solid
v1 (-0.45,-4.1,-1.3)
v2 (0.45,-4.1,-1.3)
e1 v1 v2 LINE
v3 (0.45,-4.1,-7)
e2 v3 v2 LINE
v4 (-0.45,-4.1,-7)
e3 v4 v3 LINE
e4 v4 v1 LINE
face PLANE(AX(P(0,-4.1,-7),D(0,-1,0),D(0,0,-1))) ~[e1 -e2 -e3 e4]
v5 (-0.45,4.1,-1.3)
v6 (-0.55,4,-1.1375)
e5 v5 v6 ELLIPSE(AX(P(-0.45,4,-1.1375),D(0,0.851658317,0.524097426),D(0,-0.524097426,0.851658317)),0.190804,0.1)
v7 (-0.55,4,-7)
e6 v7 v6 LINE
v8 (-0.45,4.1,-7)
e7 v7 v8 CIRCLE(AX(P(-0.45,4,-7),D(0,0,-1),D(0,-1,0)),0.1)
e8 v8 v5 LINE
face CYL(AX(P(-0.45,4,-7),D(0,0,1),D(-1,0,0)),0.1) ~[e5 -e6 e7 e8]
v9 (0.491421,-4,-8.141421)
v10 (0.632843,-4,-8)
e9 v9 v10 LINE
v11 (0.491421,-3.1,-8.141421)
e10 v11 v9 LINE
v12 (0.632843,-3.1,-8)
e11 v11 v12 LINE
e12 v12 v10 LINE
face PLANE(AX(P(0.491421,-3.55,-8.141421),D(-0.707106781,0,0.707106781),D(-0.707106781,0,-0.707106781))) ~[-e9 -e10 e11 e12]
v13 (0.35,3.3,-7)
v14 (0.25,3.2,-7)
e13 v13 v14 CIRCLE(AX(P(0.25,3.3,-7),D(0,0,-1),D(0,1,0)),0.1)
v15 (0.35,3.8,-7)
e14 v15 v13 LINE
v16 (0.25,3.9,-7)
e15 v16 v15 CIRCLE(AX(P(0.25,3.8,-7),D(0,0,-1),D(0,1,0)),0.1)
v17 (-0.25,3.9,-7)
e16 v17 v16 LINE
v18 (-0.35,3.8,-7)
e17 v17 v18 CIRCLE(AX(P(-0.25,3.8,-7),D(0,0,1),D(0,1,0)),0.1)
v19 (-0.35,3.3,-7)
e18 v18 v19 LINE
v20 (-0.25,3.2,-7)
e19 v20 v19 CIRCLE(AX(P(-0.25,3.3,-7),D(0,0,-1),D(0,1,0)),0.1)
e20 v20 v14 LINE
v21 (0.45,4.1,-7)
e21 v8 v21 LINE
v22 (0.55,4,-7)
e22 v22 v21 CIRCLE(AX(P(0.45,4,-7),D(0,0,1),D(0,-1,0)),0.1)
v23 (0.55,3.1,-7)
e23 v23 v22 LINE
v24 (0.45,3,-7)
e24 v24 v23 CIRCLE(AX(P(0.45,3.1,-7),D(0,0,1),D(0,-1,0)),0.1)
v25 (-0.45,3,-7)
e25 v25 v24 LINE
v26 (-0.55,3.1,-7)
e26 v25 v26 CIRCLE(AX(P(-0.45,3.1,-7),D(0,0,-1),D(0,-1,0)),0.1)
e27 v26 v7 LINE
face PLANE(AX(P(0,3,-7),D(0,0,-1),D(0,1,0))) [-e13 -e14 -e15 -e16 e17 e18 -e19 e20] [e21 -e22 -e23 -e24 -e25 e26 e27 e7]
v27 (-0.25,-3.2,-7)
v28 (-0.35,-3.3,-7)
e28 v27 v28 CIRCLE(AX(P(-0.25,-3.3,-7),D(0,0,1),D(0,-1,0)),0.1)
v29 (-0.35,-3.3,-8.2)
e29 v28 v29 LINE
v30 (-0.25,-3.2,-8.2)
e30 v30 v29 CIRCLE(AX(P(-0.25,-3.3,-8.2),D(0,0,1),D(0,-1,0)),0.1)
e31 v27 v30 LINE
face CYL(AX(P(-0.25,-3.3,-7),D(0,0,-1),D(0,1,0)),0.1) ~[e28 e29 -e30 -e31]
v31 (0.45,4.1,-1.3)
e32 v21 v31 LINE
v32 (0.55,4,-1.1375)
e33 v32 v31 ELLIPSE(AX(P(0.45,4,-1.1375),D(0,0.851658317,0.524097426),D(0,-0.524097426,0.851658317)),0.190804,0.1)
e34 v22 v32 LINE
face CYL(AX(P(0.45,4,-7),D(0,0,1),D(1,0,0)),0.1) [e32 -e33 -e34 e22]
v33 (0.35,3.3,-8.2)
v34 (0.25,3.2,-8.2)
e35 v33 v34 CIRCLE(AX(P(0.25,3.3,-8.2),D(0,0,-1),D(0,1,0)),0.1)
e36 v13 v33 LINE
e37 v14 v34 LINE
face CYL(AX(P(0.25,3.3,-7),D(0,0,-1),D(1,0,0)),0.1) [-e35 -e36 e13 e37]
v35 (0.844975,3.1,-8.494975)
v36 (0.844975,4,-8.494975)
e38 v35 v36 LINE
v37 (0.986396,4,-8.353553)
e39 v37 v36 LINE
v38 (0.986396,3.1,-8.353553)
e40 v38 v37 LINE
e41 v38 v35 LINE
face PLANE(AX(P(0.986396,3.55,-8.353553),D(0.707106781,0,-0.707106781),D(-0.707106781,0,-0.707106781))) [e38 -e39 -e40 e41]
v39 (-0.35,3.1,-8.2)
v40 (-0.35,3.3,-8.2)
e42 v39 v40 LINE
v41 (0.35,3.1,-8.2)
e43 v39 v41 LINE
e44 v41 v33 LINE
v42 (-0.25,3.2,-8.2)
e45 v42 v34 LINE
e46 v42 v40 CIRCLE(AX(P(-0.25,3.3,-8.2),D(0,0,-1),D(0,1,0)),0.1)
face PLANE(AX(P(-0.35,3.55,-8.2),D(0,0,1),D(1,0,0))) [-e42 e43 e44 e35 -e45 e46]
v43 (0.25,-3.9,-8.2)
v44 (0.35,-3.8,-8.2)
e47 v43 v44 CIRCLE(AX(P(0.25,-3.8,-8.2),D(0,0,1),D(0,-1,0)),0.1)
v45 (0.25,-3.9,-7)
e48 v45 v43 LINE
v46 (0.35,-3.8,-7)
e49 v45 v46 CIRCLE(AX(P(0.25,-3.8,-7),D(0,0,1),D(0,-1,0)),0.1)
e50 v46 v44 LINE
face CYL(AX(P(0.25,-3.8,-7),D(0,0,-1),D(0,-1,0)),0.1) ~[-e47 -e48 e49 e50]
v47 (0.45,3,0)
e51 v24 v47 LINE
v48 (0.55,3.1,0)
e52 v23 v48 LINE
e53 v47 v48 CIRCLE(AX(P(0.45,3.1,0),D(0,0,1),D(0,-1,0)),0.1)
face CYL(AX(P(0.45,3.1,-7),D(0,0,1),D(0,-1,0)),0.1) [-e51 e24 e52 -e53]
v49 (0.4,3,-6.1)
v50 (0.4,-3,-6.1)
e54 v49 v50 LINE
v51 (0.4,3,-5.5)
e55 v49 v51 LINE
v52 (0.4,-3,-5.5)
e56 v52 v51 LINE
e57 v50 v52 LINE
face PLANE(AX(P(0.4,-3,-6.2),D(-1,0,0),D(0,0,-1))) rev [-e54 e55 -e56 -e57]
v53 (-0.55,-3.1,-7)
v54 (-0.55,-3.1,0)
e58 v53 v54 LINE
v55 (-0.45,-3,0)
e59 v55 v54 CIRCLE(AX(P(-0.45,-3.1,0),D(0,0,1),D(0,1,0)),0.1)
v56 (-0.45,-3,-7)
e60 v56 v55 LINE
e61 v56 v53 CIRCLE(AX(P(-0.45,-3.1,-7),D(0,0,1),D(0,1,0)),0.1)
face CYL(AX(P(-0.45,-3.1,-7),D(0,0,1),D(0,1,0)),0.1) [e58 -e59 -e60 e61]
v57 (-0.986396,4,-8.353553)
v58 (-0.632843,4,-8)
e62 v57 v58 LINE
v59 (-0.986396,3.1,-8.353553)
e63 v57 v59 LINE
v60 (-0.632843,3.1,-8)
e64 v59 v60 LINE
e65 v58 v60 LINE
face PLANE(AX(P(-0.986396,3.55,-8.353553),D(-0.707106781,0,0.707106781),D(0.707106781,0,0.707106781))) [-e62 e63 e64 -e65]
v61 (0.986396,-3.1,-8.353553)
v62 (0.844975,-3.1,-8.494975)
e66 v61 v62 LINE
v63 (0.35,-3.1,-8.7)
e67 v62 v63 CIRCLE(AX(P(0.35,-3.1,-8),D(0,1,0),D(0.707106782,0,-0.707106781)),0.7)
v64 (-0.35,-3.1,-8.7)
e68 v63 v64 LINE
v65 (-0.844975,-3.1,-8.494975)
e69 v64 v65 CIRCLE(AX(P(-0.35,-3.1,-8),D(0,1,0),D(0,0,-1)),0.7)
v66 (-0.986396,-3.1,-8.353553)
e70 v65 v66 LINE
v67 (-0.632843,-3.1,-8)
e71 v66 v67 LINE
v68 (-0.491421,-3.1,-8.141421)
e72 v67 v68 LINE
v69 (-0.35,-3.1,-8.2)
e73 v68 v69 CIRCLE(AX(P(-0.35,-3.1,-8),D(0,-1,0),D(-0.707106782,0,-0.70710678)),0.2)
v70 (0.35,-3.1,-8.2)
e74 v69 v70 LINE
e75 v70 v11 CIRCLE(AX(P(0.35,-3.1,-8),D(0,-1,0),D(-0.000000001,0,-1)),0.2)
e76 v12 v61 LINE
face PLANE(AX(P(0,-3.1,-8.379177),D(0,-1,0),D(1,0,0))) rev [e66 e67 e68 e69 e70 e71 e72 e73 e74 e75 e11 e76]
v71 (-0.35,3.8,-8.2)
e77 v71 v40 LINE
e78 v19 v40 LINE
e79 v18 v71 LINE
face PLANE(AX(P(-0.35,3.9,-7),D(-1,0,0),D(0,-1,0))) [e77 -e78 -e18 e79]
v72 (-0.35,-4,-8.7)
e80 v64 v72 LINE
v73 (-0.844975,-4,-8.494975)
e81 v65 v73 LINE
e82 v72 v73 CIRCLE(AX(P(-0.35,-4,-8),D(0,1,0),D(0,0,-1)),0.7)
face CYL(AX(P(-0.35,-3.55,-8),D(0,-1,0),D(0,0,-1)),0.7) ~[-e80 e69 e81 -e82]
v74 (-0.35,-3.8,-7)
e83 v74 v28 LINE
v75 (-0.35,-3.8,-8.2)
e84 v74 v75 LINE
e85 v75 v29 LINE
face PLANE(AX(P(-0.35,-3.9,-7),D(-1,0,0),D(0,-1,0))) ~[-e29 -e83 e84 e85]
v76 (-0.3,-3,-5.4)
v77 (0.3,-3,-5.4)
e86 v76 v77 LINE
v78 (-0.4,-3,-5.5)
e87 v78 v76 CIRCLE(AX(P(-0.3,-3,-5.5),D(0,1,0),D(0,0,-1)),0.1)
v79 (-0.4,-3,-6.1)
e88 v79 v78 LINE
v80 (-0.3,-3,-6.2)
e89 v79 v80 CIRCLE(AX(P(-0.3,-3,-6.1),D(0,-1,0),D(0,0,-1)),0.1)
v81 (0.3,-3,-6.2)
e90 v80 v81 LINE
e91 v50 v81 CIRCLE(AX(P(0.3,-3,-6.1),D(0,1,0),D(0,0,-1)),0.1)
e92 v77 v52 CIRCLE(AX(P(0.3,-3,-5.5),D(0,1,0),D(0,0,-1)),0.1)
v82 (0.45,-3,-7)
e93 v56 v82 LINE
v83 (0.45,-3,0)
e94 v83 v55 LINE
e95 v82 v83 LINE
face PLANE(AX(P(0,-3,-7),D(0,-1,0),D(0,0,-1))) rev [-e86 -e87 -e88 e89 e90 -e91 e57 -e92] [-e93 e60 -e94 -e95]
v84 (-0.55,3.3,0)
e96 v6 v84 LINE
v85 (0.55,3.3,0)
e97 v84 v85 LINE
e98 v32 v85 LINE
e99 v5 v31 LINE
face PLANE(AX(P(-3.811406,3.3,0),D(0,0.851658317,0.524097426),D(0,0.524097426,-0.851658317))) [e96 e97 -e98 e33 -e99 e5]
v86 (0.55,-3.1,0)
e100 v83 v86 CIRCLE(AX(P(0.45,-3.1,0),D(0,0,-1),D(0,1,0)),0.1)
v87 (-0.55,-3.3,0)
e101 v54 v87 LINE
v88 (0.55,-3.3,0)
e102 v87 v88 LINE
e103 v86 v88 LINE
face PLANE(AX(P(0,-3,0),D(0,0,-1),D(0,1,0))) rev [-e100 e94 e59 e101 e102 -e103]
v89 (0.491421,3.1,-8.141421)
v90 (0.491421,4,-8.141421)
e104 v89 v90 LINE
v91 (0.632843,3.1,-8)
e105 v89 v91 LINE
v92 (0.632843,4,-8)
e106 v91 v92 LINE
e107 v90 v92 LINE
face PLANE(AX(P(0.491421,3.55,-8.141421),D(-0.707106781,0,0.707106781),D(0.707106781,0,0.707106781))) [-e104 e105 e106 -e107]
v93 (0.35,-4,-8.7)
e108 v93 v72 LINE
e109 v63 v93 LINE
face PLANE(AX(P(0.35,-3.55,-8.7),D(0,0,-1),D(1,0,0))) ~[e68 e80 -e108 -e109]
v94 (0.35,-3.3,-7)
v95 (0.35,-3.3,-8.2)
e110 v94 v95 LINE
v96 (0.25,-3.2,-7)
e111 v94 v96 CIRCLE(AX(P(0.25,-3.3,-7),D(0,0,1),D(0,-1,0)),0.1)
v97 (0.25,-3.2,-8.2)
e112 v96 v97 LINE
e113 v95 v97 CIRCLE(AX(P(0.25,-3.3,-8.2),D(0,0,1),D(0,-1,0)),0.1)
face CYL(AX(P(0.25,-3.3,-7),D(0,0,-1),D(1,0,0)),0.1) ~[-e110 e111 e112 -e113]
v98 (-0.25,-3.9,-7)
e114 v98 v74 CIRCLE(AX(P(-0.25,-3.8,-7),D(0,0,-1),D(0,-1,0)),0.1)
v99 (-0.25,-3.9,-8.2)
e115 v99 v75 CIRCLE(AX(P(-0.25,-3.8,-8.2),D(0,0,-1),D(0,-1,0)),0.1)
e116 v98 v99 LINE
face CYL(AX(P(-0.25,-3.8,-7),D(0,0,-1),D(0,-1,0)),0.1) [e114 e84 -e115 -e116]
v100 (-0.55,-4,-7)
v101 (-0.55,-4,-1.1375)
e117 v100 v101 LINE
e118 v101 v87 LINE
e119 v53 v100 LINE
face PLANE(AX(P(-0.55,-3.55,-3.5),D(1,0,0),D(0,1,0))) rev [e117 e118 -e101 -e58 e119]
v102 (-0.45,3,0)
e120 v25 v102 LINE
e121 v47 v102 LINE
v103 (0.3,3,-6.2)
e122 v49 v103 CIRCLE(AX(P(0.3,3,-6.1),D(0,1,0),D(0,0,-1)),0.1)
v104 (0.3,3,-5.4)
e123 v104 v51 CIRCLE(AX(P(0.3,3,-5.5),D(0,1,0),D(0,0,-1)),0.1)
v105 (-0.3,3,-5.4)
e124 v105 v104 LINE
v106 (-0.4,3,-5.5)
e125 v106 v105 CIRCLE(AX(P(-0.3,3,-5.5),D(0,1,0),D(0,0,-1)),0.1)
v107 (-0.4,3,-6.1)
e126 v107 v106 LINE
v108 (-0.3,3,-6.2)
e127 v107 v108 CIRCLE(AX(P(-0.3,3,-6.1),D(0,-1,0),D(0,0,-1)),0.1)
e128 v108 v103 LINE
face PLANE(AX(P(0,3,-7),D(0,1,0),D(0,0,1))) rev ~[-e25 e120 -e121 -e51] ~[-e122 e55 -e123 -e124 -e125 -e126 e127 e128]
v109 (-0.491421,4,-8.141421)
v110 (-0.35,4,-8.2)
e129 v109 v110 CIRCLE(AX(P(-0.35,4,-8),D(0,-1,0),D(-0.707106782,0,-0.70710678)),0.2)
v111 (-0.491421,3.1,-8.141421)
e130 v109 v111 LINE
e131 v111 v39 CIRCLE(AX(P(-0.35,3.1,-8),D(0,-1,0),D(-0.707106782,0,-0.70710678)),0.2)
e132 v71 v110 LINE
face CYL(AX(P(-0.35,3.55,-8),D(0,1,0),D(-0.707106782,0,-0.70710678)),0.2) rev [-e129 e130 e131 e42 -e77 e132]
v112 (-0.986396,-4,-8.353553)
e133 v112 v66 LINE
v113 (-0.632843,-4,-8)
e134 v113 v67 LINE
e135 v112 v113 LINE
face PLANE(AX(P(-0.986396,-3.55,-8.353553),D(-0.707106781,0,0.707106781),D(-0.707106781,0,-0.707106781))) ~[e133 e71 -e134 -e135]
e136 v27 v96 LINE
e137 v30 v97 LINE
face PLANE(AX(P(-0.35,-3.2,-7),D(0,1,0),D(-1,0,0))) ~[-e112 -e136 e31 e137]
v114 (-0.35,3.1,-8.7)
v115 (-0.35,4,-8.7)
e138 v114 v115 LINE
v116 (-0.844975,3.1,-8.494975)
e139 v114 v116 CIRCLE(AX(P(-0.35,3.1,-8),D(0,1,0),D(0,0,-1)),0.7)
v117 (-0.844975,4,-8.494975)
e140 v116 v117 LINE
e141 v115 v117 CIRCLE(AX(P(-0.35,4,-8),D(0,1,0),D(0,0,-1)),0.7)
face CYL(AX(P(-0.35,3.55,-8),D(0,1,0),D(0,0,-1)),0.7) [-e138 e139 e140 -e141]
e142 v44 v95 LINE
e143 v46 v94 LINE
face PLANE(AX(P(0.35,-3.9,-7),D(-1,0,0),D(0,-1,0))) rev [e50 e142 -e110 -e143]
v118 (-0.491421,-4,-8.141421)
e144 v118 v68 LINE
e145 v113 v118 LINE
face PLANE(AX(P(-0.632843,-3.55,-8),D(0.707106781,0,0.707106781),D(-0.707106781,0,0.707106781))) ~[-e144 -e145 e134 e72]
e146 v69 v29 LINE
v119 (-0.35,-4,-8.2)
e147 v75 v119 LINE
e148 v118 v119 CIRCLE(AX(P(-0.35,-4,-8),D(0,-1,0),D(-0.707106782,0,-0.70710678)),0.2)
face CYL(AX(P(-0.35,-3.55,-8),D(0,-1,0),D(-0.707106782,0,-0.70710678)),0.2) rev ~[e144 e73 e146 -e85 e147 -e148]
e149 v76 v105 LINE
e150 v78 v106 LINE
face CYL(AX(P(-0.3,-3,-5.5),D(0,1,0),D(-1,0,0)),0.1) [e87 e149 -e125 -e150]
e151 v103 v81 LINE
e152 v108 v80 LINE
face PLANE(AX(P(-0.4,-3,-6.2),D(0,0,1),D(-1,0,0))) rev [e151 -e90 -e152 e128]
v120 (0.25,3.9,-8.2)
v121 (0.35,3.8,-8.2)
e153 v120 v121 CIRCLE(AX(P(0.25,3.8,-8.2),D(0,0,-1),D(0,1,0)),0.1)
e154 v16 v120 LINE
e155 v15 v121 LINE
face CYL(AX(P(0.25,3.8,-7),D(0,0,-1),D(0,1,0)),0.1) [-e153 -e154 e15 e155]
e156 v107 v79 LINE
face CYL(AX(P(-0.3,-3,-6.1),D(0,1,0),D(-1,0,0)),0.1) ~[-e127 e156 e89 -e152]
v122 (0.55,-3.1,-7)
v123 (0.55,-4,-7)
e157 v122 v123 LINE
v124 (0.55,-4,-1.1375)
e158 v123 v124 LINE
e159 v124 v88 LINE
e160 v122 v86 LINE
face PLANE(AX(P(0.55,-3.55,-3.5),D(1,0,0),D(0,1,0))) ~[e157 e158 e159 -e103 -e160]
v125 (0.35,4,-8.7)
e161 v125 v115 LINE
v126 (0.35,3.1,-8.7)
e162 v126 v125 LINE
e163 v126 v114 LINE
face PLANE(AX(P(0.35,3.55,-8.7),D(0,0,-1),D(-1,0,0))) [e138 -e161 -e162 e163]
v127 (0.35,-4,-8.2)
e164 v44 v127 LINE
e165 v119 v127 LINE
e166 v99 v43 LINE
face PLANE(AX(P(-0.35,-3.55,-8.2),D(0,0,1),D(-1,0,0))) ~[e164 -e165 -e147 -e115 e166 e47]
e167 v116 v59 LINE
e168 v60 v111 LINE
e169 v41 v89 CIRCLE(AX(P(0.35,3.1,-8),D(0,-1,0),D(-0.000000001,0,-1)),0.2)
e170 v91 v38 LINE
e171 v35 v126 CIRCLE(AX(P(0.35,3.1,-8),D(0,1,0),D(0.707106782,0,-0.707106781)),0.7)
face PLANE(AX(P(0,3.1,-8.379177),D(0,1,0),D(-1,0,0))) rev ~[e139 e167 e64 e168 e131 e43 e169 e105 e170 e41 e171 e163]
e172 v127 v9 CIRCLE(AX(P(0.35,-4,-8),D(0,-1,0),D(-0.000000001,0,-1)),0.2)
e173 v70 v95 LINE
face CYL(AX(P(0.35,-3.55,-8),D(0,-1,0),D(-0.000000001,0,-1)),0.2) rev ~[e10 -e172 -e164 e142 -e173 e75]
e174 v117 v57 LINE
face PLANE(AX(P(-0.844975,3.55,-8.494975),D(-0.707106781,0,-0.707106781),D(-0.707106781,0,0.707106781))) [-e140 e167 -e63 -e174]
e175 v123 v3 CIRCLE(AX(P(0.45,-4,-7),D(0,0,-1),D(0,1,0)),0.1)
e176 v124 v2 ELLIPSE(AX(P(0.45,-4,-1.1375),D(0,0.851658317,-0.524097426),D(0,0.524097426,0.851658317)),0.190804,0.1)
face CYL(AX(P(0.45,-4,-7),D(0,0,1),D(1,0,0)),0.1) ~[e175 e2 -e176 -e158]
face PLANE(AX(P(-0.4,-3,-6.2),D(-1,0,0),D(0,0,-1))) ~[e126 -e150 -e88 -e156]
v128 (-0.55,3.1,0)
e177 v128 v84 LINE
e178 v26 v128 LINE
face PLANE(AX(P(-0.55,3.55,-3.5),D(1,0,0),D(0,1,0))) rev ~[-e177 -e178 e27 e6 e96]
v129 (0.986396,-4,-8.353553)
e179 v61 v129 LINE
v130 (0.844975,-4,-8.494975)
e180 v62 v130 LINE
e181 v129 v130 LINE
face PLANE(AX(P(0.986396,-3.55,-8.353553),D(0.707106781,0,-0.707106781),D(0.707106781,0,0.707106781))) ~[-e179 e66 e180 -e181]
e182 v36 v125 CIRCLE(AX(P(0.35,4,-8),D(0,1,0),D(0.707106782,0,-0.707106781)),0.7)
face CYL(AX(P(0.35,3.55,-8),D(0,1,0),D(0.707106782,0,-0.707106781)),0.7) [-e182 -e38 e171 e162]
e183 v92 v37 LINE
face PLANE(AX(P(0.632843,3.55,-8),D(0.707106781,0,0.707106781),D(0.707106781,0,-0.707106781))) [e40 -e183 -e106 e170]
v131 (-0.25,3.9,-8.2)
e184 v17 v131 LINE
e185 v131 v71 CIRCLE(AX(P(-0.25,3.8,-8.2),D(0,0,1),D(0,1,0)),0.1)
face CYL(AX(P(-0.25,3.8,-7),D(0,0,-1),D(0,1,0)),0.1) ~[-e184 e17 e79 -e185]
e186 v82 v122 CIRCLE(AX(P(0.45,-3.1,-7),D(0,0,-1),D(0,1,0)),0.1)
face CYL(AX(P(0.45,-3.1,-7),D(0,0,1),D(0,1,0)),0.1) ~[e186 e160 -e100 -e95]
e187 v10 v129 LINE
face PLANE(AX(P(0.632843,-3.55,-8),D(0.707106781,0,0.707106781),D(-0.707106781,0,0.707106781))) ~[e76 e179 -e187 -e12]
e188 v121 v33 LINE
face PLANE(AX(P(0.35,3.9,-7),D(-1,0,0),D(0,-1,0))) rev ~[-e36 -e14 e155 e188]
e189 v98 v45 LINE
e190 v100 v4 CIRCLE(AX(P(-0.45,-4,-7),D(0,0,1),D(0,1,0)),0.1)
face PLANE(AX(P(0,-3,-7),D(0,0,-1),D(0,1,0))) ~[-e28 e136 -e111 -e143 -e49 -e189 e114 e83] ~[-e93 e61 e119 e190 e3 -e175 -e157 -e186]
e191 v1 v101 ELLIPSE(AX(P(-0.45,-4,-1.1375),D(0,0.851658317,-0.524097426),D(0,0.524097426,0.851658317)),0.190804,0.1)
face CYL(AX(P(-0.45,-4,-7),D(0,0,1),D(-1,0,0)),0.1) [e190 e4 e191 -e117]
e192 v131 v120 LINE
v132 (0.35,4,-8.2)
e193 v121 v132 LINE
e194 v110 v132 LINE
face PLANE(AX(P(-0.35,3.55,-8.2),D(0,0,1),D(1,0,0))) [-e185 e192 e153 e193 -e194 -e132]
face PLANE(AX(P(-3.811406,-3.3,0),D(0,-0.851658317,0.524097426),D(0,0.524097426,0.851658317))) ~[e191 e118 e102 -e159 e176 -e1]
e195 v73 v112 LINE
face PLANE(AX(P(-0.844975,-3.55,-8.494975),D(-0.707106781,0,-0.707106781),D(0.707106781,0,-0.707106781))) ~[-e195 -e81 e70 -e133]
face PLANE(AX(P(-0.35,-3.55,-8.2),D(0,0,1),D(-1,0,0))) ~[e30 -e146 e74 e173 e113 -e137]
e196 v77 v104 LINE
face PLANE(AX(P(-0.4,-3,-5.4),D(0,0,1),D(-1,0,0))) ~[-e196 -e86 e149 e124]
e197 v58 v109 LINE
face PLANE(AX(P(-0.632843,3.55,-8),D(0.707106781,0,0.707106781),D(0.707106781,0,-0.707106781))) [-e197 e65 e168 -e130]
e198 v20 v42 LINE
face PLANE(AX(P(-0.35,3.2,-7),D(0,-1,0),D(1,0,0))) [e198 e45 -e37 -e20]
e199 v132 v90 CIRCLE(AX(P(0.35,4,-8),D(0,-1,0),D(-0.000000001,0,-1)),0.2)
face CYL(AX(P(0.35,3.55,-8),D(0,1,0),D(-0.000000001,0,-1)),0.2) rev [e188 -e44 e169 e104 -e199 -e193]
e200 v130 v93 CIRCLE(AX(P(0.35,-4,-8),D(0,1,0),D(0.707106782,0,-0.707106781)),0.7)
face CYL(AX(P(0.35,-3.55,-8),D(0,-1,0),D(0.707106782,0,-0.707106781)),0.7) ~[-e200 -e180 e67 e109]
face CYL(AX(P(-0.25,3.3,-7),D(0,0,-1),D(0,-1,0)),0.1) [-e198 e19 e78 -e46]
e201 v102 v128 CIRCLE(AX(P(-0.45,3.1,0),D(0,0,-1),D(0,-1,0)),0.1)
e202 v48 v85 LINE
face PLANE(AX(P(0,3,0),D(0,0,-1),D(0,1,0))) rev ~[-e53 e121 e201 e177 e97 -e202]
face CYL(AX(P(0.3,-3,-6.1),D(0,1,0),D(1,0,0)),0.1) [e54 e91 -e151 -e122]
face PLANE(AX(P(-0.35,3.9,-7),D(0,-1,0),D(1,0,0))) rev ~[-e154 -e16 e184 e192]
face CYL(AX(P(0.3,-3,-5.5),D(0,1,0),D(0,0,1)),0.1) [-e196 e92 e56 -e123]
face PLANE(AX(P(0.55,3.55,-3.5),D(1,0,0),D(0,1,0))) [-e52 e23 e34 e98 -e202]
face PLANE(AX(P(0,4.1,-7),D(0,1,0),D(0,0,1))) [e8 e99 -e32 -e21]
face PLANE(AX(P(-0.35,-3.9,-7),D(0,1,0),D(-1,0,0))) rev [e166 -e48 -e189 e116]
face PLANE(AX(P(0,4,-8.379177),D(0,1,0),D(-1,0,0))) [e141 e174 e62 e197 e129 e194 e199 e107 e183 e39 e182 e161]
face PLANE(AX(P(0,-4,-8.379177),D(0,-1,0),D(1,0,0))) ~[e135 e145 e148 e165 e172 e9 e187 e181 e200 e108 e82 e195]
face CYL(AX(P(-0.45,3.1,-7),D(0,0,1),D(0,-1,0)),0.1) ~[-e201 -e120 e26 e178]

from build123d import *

# Parameters (mm, degrees)
F0_W         = 1.1
F0_H         = 7
F1_DEPTH     = 0.55
F2_W         = 0.7
F2_H         = 0.7
F3_DEPTH     = 1.2
F4_R         = 0.1
F7_DEPTH     = 0.45
F8_W         = 0.8
F8_H         = 0.8
F9_DEPTH     = 3
F10_R        = 0.1
F11_T1_DEPTH = 7.6228122918


# Not quite as in the source:
# - a fillet or chamfer that OpenCascade refuses, or shapes differently, is made with other operations: its cross-section is extruded or revolved along the edge and cut away or added


with BuildPart() as f1:
    # F0 (on Right) → F1 (new body, symmetric)
    with BuildSketch(Plane.YZ):
        with Locations((3.55, -3.5)):
            Rectangle(F0_W, F0_H)
    extrude(amount=F1_DEPTH, both=True)

    # F2 (on face) → F3 (join)
    with BuildSketch(Plane(origin=(0, 0, -7), x_dir=(1, 0, 0), z_dir=(0, 0, -1))):
        with Locations((0, -3.55)):
            Rectangle(F2_W, F2_H)
    extrude(amount=F3_DEPTH)

    # F4
    f4_edges = [f1.edges().sort_by_distance(p)[0] for p in [
        (0.55, 4.1, -3.5),
        (0.55, 3, -3.5),
        (-0.55, 4.1, -3.5),
        (0.35, 3.9, -7.6),
        (-0.35, 3.9, -7.6),
        (0.35, 3.2, -7.6),
        (-0.35, 3.2, -7.6),
        (-0.55, 3, -3.5),
    ]]
    fillet(f4_edges, radius=F4_R)

    # F6 (on mid) → F7 (join, symmetric)
    with BuildSketch(Plane(origin=(0, 3.55, 0), x_dir=(-1, 0, 0), z_dir=(0, 1, 0))):
        with BuildLine():
            ThreePointArc((0.4914213562, -8.1414213562), (0.4265366865, -8.1847759065), (0.35, -8.2))
            Line((0.35, -8.2), (-0.35, -8.2))
            ThreePointArc((-0.35, -8.2), (-0.4265366865, -8.1847759065), (-0.4914213562, -8.1414213562))
            Line((-0.4914213562, -8.1414213562), (-0.6328427125, -8))
            Line((-0.6328427125, -8), (-0.9863961031, -8.3535533906))
            Line((-0.9863961031, -8.3535533906), (-0.8449747468, -8.4949747468))
            ThreePointArc((-0.8449747468, -8.4949747468), (-0.6178784027, -8.6467156728), (-0.35, -8.7))
            Line((-0.35, -8.7), (0.35, -8.7))
            ThreePointArc((0.35, -8.7), (0.6178784027, -8.6467156728), (0.8449747468, -8.4949747468))
            Line((0.8449747468, -8.4949747468), (0.9863961031, -8.3535533906))
            Line((0.9863961031, -8.3535533906), (0.6328427125, -8))
            Line((0.6328427125, -8), (0.4914213562, -8.1414213562))
        make_face()
    extrude(amount=F7_DEPTH, both=True)

    # F8 (on face) → F9 (join, through all)
    with BuildSketch(Plane.XZ.offset(-3)):
        with Locations((0, -5.8)):
            Rectangle(F8_W, F8_H)
    extrude(amount=F9_DEPTH)

    # F10
    f10_edges = [f1.edges().sort_by_distance(p)[0] for p in [
        (-0.4, 1.5, -5.4),
        (-0.4, 1.5, -6.2),
        (0.4, 1.5, -6.2),
        (0.4, 1.5, -5.4),
    ]]
    fillet(f10_edges, radius=F10_R)

    # F11: chamfer of 0.8 x 1.3 on 1 edges, made by hand

    # F11_s2 → F11_t1 (cut)
    with BuildSketch(Plane.YZ.offset(-3.8114061459)):
        Polygon((3.3, 0), (4.1, -1.3), (4.1, 0), align=None)
    extrude(amount=F11_T1_DEPTH, mode=Mode.SUBTRACT)

    # F12: F1 across plane


with BuildPart() as f1_1:
    add(f1.part)
    add(f1.part.mirror(Plane.XZ))


solid = f1_1.part
